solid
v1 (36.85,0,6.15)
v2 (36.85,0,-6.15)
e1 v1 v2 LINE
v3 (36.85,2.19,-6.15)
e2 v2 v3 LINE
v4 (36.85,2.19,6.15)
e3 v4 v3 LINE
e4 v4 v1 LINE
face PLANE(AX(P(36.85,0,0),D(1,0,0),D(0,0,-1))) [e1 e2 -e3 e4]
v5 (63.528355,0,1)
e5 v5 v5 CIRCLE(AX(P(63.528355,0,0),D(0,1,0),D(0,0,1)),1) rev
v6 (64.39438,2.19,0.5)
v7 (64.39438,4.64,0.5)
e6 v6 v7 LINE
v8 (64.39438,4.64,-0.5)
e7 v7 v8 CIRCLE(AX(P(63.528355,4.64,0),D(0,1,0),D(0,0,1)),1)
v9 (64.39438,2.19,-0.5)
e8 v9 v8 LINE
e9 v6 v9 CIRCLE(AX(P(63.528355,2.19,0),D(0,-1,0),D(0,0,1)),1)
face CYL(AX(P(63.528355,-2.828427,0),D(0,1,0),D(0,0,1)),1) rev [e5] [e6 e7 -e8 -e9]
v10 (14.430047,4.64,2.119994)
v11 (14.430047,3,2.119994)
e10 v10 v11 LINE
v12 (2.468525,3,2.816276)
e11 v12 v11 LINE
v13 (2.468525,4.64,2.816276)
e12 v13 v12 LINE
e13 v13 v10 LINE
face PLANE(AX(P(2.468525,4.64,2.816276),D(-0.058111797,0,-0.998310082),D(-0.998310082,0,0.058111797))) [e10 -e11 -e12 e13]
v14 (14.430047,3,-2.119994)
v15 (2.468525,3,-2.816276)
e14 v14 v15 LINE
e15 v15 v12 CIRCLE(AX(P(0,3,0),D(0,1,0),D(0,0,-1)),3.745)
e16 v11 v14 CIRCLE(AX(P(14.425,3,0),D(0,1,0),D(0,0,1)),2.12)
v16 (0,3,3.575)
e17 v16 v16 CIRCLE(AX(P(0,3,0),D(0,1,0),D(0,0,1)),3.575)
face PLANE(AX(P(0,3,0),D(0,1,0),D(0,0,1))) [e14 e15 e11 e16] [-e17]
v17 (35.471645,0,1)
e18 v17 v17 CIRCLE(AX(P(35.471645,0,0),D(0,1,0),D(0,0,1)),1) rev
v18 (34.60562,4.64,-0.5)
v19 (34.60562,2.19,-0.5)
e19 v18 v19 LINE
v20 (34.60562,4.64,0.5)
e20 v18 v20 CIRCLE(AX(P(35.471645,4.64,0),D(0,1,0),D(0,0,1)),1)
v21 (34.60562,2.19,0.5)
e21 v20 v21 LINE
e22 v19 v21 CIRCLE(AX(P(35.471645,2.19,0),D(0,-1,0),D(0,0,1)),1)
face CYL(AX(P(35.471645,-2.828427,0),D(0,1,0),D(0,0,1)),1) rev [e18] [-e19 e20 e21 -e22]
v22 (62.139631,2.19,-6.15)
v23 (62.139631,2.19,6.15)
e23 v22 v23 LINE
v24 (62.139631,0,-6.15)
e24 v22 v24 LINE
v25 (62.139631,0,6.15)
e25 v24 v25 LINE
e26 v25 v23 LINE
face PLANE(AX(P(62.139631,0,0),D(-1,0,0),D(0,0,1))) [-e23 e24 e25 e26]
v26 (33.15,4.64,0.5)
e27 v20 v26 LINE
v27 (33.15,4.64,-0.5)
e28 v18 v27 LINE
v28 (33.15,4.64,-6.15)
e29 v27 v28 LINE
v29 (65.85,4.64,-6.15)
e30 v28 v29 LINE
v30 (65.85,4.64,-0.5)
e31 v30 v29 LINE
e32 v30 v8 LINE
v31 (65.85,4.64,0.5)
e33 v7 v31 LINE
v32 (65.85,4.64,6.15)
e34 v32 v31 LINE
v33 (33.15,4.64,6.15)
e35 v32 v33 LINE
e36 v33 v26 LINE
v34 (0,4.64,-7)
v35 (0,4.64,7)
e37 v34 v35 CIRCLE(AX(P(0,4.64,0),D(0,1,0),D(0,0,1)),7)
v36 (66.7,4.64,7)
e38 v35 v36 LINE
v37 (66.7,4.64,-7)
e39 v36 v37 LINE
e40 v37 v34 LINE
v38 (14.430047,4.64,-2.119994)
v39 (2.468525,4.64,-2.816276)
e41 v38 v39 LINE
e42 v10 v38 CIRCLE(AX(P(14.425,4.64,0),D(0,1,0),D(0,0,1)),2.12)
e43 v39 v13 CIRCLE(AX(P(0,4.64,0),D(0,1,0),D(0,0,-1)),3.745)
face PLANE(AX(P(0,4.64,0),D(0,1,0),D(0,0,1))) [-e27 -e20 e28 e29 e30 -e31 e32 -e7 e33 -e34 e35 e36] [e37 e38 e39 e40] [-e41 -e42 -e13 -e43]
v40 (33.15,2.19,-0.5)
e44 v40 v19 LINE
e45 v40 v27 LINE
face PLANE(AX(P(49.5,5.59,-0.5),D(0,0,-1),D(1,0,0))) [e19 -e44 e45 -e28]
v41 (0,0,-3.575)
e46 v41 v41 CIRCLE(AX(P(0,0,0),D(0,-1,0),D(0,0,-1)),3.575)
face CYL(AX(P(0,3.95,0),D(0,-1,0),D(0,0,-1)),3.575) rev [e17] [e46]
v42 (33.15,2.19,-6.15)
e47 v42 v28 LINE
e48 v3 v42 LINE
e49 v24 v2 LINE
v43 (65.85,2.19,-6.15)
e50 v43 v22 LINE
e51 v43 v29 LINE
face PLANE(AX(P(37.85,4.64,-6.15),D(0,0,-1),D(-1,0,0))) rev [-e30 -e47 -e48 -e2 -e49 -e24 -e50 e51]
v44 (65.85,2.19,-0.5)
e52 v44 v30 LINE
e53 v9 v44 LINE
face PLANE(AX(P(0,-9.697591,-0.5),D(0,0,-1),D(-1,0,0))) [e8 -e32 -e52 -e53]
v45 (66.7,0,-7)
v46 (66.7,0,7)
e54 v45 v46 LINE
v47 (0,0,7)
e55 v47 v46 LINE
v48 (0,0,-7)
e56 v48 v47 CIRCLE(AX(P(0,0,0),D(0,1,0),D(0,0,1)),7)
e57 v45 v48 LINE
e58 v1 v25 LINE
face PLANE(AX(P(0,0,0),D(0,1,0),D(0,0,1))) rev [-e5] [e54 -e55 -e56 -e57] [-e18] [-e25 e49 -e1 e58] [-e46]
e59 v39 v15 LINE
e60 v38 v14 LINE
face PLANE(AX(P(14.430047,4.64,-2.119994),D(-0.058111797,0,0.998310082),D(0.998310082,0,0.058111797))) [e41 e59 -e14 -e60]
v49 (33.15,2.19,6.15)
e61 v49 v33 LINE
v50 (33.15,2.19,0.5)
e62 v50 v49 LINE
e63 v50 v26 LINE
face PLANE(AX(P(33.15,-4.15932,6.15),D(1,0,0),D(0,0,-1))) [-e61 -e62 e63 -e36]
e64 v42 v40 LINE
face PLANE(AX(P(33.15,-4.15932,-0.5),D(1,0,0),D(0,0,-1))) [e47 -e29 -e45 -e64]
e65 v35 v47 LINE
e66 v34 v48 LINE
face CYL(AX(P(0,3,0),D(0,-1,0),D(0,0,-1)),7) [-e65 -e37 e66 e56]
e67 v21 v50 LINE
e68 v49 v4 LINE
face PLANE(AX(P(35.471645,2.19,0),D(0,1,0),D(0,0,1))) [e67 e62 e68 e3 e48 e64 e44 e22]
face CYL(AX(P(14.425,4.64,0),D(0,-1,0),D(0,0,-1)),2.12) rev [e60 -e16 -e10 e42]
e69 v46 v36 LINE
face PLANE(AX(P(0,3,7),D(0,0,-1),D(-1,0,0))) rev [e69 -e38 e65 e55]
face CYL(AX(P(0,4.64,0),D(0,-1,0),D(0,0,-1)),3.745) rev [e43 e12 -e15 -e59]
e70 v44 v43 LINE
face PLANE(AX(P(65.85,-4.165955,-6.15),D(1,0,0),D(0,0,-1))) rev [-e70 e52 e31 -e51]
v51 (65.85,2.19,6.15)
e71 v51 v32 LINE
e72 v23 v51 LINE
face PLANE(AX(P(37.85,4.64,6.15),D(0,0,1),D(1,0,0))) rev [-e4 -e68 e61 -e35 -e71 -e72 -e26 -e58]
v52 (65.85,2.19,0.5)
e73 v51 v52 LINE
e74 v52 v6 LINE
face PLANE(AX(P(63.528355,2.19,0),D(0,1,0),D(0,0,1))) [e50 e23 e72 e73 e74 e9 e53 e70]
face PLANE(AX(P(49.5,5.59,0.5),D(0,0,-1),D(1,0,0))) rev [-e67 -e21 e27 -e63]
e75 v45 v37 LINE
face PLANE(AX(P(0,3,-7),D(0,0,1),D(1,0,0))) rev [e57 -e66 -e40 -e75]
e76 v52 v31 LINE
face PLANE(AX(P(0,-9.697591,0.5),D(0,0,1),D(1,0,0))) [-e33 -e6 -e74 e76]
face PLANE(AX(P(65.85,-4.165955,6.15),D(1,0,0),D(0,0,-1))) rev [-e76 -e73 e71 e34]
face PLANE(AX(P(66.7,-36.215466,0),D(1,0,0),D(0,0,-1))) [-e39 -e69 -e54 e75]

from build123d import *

# Parameters (mm, degrees)
BOSS_EXTRUDE1_DEPTH     = 3
SKETCH2_R               = 3.575
CUT_EXTRUDE1_DEPTH      = 3.95
BOSS_EXTRUDE2_DEPTH     = 1.64
SKETCH4_R               = 3.25
CUT_EXTRUDE2_DEPTH      = 63.566201739
CAVITY1_OUTLINE_R       = 3.25
CAVITY1_DEPTH           = 4.64
CAVITY1_START           = 3.19
CAVITY1_2_DEPTH         = 1.45
CUT_EXTRUDE4_DEPTH      = 63.566201739
BOSS_EXTRUDE3_START     = -4.64
BOSS_EXTRUDE3_DEPTH     = 4.64
BOSS_EXTRUDE4_DEPTH     = 4.64
BOSS_EXTRUDE5_DEPTH     = 4.64
CUT_EXTRUDE5_DEPTH      = 1.45
SKETCH7_R               = 1
CUT_EXTRUDE6_DEPTH      = 4.64
CUT_EXTRUDE7_DEPTH      = 68.226628653
CUT_EXTRUDE7_DEPTH_BACK = 68.226628653
SKETCH10_W              = 23.28963149
SKETCH10_H              = 12.3
SKETCH10_W_2            = 22.98963149
SKETCH10_H_2            = 12
CUT_EXTRUDE8_DEPTH      = 1.45
CUT_EXTRUDE9_DEPTH      = 1.45
SKETCH14_W              = 12.3
SKETCH14_H              = 3.19
CUT_EXTRUDE10_DEPTH     = 1
SKETCH15_W              = 12.3
SKETCH15_H              = 3.19
CUT_EXTRUDE11_DEPTH     = 1
CUT_EXTRUDE12_DEPTH     = 1
CUT_EXTRUDE13_DEPTH     = 1


# Read off the part's stored shape, not the designer's step: Cavity1
with BuildPart() as part:
    # Sketch1 → Boss-Extrude1 (new body)
    with BuildSketch(Plane(origin=(0, 0, 0), x_dir=(1, 0, 0), z_dir=(0, 1, 0))):
        with BuildLine():
            Line((0, 7), (55, 7))
            ThreePointArc((55, 7), (62, 0), (55, -7))
            Line((55, -7), (0, -7))
            ThreePointArc((0, -7), (-7, 0), (0, 7))
        make_face()
    extrude(amount=BOSS_EXTRUDE1_DEPTH)

    # Sketch2 → Cut-Extrude1 (cut)
    with BuildSketch(Plane.XZ):
        with Locations(Location((0, 0, 0), (0, 0, 270))):
            Circle(SKETCH2_R)
    extrude(amount=-CUT_EXTRUDE1_DEPTH, mode=Mode.SUBTRACT)

    # Sketch3 → Boss-Extrude2 (add)
    with BuildSketch(Plane(origin=(0, 3, 0), x_dir=(1, 0, 0), z_dir=(0, 1, 0))):
        with BuildLine():
            Line((0, -7), (55, -7))
            ThreePointArc((55, -7), (62, 0), (55, 7))
            Line((55, 7), (0, 7))
            ThreePointArc((0, 7), (-7, 0), (0, -7))
        make_face()
        with BuildLine():
            Line((14.43004688, 2.119993993), (2.468524523, 2.816276208))
            ThreePointArc((2.468524523, 2.816276208), (-3.745, 0), (2.468524523, -2.816276208))
            Line((2.468524523, -2.816276208), (14.43004688, -2.119993993))
            ThreePointArc((14.43004688, -2.119993993), (16.545, 0), (14.43004688, 2.119993993))
        make_face(mode=Mode.SUBTRACT)
    extrude(amount=BOSS_EXTRUDE2_DEPTH)

    # Sketch4 → Cut-Extrude2 (cut, through all)
    with BuildSketch(Plane(origin=(0, 4.64, 0), x_dir=(1, 0, 0), z_dir=(0, 1, 0))):
        with Locations(Location((55, 0, 0), (0, 0, 270))):
            Circle(SKETCH4_R)
    extrude(amount=-CUT_EXTRUDE2_DEPTH, mode=Mode.SUBTRACT)

    # Cavity1 outline → Cavity1 (cut)
    with BuildSketch(Plane(origin=(0, 0, 0), x_dir=(1, 0, 0), z_dir=(0, 1, 0))):
        with BuildLine():
            Line((58.605551275, 6), (38, 6))
            Line((38, 6), (38, -6))
            Line((38, -6), (58.605551275, -6))
            ThreePointArc((58.605551275, -6), (59.949747468, -4.949747468), (61, -3.605551275))
            Line((61, -3.605551275), (61, 3.605551275))
            ThreePointArc((61, 3.605551275), (59.949747468, 4.949747468), (58.605551275, 6))
        make_face()
        with Locations((55, 0)):
            Circle(CAVITY1_OUTLINE_R, mode=Mode.SUBTRACT)
    extrude(amount=CAVITY1_DEPTH, mode=Mode.SUBTRACT)

    # Cavity1 2 outline → Cavity1 2 (cut)
    with BuildSketch(Plane(origin=(0, 0, 0), x_dir=(1, 0, 0), z_dir=(0, 1, 0)).offset(CAVITY1_START)):
        with BuildLine():
            Line((33.3, 0.5), (34.605619966, 0.5))
            ThreePointArc((34.605619966, 0.5), (36.47164537, 0), (34.605619966, -0.5))
            Line((34.605619966, -0.5), (33.3, -0.5))
            Line((33.3, -0.5), (33.3, -6))
            Line((33.3, -6), (38, -6))
            Line((38, -6), (38, 6))
            Line((38, 6), (33.3, 6))
            Line((33.3, 6), (33.3, 0.5))
        make_face()
        with BuildLine():
            ThreePointArc((61, -3.605551275), (62, 0), (61, 3.605551275))
            Line((61, 3.605551275), (61, -3.605551275))
        make_face()
    extrude(amount=CAVITY1_2_DEPTH, mode=Mode.SUBTRACT)

    # Sketch5 → Cut-Extrude4 (cut, through all)
    with BuildSketch(Plane.XZ):
        with BuildLine():
            Line((61, 3.605551275), (61, -3.605551275))
            ThreePointArc((61, -3.605551275), (62, 0), (61, 3.605551275))
        make_face()
    extrude(amount=-CUT_EXTRUDE4_DEPTH, mode=Mode.SUBTRACT)

    # Sketch6 → Boss-Extrude3 (add)
    with BuildSketch(Plane(origin=(0, 4.64, 0), x_dir=(1, 0, 0), z_dir=(0, 1, 0)).offset(BOSS_EXTRUDE3_START)):
        with BuildLine():
            Line((61, -6), (58.605551275, -6))
            ThreePointArc((58.605551275, -6), (56.870828693, -6.745368782), (55, -7))
            Line((55, -7), (66.7, -7))
            Line((66.7, -7), (66.7, 7))
            Line((66.7, 7), (55, 7))
            ThreePointArc((55, 7), (56.870828693, 6.745368782), (58.605551275, 6))
            Line((58.605551275, 6), (61, 6))
            Line((61, 6), (65.7, 6))
            Line((65.7, 6), (65.7, 0.5))
            Line((65.7, 0.5), (65.7, -0.5))
            Line((65.7, -0.5), (65.7, -6))
            Line((65.7, -6), (61, -6))
        make_face()
        with BuildLine():
            Line((58.605551275, -6), (33.3, -6))
            Line((33.3, -6), (33.3, -7))
            Line((33.3, -7), (55, -7))
            ThreePointArc((55, -7), (56.870828693, -6.745368782), (58.605551275, -6))
        make_face()
        with BuildLine():
            Line((33.3, 7), (33.3, 6))
            Line((33.3, 6), (58.605551275, 6))
            ThreePointArc((58.605551275, 6), (56.870828693, 6.745368782), (55, 7))
            Line((55, 7), (33.3, 7))
        make_face()
    extrude(amount=BOSS_EXTRUDE3_DEPTH)

    # Sketch6<3> → Boss-Extrude4 (add)
    with BuildSketch(Plane(origin=(0, 4.64, 0), x_dir=(1, 0, 0), z_dir=(0, 1, 0))):
        with BuildLine():
            Line((64.394380034, -0.5), (65.7, -0.5))
            Line((65.7, -0.5), (65.7, 0.5))
            Line((65.7, 0.5), (64.394380034, 0.5))
            ThreePointArc((64.394380034, 0.5), (62.52835463, 0), (64.394380034, -0.5))
        make_face()
    extrude(amount=-BOSS_EXTRUDE4_DEPTH)

    # Sketch6<5> → Boss-Extrude5 (add)
    with BuildSketch(Plane(origin=(0, 4.64, 0), x_dir=(1, 0, 0), z_dir=(0, 1, 0))):
        with BuildLine():
            Line((61, 6), (61, -6))
            Line((61, -6), (65.7, -6))
            Line((65.7, -6), (65.7, -0.5))
            Line((65.7, -0.5), (64.394380034, -0.5))
            ThreePointArc((64.394380034, -0.5), (62.52835463, 0), (64.394380034, 0.5))
            Line((64.394380034, 0.5), (65.7, 0.5))
            Line((65.7, 0.5), (65.7, 6))
            Line((65.7, 6), (61, 6))
        make_face()
    extrude(amount=-BOSS_EXTRUDE5_DEPTH)

    # Sketch6<6> → Cut-Extrude5 (cut)
    with BuildSketch(Plane(origin=(0, 4.64, 0), x_dir=(1, 0, 0), z_dir=(0, 1, 0))):
        with BuildLine():
            Line((61, 6), (61, -6))
            Line((61, -6), (65.7, -6))
            Line((65.7, -6), (65.7, -0.5))
            Line((65.7, -0.5), (64.394380034, -0.5))
            ThreePointArc((64.394380034, -0.5), (62.52835463, 0), (64.394380034, 0.5))
            Line((64.394380034, 0.5), (65.7, 0.5))
            Line((65.7, 0.5), (65.7, 6))
            Line((65.7, 6), (61, 6))
        make_face()
    extrude(amount=-CUT_EXTRUDE5_DEPTH, mode=Mode.SUBTRACT)

    # Sketch7 → Cut-Extrude6 (cut)
    with BuildSketch(Plane(origin=(0, 4.64, 0), x_dir=(1, 0, 0), z_dir=(0, 1, 0))):
        with Locations(Location((63.52835463, 0, 0), (0, 0, 270))):
            Circle(SKETCH7_R)
        with Locations(Location((35.47164537, 0, 0), (0, 0, 270))):
            Circle(SKETCH7_R)
    extrude(amount=-CUT_EXTRUDE6_DEPTH, mode=Mode.SUBTRACT)

    # Sketch10 → Cut-Extrude7 (cut, two sides: drawn at the far end of the back side and taken through both)
    with BuildSketch(Plane.XZ.offset(-CUT_EXTRUDE7_DEPTH_BACK)):
        with Locations((49.494815745, 0)):
            Rectangle(SKETCH10_W, SKETCH10_H)
        with Locations((49.494815745, 0)):
            Rectangle(SKETCH10_W_2, SKETCH10_H_2, mode=Mode.SUBTRACT)
    extrude(amount=CUT_EXTRUDE7_DEPTH + CUT_EXTRUDE7_DEPTH_BACK, mode=Mode.SUBTRACT)

    # Sketch11 → Cut-Extrude8 (cut)
    with BuildSketch(Plane(origin=(0, 4.64, 0), x_dir=(1, 0, 0), z_dir=(0, 1, 0))):
        Polygon((37.85, -6), (33.3, -6), (33.3, -0.5), (33.15, -0.5), (33.15, -6.15), (37.85, -6.15), align=None)
        Polygon((33.3, 0.5), (33.3, 6), (37.85, 6), (37.85, 6.15), (33.15, 6.15), (33.15, 0.5), align=None)
    extrude(amount=-CUT_EXTRUDE8_DEPTH, mode=Mode.SUBTRACT)

    # Sketch13 → Cut-Extrude9 (cut)
    with BuildSketch(Plane(origin=(0, 4.64, 0), x_dir=(1, 0, 0), z_dir=(0, 1, 0))):
        Polygon((61.13963149, -6), (65.7, -6), (65.7, -0.5), (65.85, -0.5), (65.85, -6.15), (61.13963149, -6.15), align=None)
        Polygon((61.13963149, 6), (65.7, 6), (65.7, 0.5), (65.85, 0.5), (65.85, 6.15), (61.13963149, 6.15), align=None)
    extrude(amount=-CUT_EXTRUDE9_DEPTH, mode=Mode.SUBTRACT)

    # Sketch14 → Cut-Extrude10 (cut)
    with BuildSketch(Plane(origin=(37.85, 0, 0), x_dir=(0, 0, -1), z_dir=(1, 0, 0))):
        with Locations((0, 1.595)):
            Rectangle(SKETCH14_W, SKETCH14_H)
    extrude(amount=-CUT_EXTRUDE10_DEPTH, mode=Mode.SUBTRACT)

    # Sketch15 → Cut-Extrude11 (cut)
    with BuildSketch(Plane.ZY.offset(-61.13963149)):
        with Locations((0, 1.595)):
            Rectangle(SKETCH15_W, SKETCH15_H)
    extrude(amount=-CUT_EXTRUDE11_DEPTH, mode=Mode.SUBTRACT)

    # Sketch16 → Cut-Extrude12 (cut)
    with BuildSketch(Plane(origin=(0, 3.19, 0), x_dir=(1, 0, 0), z_dir=(0, 1, 0))):
        with BuildLine():
            Line((62.13963149, 6.15), (62.13963149, -6.15))
            Line((62.13963149, -6.15), (65.85, -6.15))
            Line((65.85, -6.15), (65.85, -0.5))
            Line((65.85, -0.5), (64.394380034, -0.5))
            ThreePointArc((64.394380034, -0.5), (62.52835463, 0), (64.394380034, 0.5))
            Line((64.394380034, 0.5), (65.85, 0.5))
            Line((65.85, 0.5), (65.85, 6.15))
            Line((65.85, 6.15), (62.13963149, 6.15))
        make_face()
    extrude(amount=-CUT_EXTRUDE12_DEPTH, mode=Mode.SUBTRACT)

    # Sketch17 → Cut-Extrude13 (cut)
    with BuildSketch(Plane(origin=(0, 3.19, 0), x_dir=(1, 0, 0), z_dir=(0, 1, 0))):
        with BuildLine():
            Line((36.85, -6.15), (36.85, 6.15))
            Line((36.85, 6.15), (33.15, 6.15))
            Line((33.15, 6.15), (33.15, 0.5))
            Line((33.15, 0.5), (34.605619966, 0.5))
            ThreePointArc((34.605619966, 0.5), (36.47164537, 0), (34.605619966, -0.5))
            Line((34.605619966, -0.5), (33.15, -0.5))
            Line((33.15, -0.5), (33.15, -6.15))
            Line((33.15, -6.15), (36.85, -6.15))
        make_face()
    extrude(amount=-CUT_EXTRUDE13_DEPTH, mode=Mode.SUBTRACT)


solid = part.part
